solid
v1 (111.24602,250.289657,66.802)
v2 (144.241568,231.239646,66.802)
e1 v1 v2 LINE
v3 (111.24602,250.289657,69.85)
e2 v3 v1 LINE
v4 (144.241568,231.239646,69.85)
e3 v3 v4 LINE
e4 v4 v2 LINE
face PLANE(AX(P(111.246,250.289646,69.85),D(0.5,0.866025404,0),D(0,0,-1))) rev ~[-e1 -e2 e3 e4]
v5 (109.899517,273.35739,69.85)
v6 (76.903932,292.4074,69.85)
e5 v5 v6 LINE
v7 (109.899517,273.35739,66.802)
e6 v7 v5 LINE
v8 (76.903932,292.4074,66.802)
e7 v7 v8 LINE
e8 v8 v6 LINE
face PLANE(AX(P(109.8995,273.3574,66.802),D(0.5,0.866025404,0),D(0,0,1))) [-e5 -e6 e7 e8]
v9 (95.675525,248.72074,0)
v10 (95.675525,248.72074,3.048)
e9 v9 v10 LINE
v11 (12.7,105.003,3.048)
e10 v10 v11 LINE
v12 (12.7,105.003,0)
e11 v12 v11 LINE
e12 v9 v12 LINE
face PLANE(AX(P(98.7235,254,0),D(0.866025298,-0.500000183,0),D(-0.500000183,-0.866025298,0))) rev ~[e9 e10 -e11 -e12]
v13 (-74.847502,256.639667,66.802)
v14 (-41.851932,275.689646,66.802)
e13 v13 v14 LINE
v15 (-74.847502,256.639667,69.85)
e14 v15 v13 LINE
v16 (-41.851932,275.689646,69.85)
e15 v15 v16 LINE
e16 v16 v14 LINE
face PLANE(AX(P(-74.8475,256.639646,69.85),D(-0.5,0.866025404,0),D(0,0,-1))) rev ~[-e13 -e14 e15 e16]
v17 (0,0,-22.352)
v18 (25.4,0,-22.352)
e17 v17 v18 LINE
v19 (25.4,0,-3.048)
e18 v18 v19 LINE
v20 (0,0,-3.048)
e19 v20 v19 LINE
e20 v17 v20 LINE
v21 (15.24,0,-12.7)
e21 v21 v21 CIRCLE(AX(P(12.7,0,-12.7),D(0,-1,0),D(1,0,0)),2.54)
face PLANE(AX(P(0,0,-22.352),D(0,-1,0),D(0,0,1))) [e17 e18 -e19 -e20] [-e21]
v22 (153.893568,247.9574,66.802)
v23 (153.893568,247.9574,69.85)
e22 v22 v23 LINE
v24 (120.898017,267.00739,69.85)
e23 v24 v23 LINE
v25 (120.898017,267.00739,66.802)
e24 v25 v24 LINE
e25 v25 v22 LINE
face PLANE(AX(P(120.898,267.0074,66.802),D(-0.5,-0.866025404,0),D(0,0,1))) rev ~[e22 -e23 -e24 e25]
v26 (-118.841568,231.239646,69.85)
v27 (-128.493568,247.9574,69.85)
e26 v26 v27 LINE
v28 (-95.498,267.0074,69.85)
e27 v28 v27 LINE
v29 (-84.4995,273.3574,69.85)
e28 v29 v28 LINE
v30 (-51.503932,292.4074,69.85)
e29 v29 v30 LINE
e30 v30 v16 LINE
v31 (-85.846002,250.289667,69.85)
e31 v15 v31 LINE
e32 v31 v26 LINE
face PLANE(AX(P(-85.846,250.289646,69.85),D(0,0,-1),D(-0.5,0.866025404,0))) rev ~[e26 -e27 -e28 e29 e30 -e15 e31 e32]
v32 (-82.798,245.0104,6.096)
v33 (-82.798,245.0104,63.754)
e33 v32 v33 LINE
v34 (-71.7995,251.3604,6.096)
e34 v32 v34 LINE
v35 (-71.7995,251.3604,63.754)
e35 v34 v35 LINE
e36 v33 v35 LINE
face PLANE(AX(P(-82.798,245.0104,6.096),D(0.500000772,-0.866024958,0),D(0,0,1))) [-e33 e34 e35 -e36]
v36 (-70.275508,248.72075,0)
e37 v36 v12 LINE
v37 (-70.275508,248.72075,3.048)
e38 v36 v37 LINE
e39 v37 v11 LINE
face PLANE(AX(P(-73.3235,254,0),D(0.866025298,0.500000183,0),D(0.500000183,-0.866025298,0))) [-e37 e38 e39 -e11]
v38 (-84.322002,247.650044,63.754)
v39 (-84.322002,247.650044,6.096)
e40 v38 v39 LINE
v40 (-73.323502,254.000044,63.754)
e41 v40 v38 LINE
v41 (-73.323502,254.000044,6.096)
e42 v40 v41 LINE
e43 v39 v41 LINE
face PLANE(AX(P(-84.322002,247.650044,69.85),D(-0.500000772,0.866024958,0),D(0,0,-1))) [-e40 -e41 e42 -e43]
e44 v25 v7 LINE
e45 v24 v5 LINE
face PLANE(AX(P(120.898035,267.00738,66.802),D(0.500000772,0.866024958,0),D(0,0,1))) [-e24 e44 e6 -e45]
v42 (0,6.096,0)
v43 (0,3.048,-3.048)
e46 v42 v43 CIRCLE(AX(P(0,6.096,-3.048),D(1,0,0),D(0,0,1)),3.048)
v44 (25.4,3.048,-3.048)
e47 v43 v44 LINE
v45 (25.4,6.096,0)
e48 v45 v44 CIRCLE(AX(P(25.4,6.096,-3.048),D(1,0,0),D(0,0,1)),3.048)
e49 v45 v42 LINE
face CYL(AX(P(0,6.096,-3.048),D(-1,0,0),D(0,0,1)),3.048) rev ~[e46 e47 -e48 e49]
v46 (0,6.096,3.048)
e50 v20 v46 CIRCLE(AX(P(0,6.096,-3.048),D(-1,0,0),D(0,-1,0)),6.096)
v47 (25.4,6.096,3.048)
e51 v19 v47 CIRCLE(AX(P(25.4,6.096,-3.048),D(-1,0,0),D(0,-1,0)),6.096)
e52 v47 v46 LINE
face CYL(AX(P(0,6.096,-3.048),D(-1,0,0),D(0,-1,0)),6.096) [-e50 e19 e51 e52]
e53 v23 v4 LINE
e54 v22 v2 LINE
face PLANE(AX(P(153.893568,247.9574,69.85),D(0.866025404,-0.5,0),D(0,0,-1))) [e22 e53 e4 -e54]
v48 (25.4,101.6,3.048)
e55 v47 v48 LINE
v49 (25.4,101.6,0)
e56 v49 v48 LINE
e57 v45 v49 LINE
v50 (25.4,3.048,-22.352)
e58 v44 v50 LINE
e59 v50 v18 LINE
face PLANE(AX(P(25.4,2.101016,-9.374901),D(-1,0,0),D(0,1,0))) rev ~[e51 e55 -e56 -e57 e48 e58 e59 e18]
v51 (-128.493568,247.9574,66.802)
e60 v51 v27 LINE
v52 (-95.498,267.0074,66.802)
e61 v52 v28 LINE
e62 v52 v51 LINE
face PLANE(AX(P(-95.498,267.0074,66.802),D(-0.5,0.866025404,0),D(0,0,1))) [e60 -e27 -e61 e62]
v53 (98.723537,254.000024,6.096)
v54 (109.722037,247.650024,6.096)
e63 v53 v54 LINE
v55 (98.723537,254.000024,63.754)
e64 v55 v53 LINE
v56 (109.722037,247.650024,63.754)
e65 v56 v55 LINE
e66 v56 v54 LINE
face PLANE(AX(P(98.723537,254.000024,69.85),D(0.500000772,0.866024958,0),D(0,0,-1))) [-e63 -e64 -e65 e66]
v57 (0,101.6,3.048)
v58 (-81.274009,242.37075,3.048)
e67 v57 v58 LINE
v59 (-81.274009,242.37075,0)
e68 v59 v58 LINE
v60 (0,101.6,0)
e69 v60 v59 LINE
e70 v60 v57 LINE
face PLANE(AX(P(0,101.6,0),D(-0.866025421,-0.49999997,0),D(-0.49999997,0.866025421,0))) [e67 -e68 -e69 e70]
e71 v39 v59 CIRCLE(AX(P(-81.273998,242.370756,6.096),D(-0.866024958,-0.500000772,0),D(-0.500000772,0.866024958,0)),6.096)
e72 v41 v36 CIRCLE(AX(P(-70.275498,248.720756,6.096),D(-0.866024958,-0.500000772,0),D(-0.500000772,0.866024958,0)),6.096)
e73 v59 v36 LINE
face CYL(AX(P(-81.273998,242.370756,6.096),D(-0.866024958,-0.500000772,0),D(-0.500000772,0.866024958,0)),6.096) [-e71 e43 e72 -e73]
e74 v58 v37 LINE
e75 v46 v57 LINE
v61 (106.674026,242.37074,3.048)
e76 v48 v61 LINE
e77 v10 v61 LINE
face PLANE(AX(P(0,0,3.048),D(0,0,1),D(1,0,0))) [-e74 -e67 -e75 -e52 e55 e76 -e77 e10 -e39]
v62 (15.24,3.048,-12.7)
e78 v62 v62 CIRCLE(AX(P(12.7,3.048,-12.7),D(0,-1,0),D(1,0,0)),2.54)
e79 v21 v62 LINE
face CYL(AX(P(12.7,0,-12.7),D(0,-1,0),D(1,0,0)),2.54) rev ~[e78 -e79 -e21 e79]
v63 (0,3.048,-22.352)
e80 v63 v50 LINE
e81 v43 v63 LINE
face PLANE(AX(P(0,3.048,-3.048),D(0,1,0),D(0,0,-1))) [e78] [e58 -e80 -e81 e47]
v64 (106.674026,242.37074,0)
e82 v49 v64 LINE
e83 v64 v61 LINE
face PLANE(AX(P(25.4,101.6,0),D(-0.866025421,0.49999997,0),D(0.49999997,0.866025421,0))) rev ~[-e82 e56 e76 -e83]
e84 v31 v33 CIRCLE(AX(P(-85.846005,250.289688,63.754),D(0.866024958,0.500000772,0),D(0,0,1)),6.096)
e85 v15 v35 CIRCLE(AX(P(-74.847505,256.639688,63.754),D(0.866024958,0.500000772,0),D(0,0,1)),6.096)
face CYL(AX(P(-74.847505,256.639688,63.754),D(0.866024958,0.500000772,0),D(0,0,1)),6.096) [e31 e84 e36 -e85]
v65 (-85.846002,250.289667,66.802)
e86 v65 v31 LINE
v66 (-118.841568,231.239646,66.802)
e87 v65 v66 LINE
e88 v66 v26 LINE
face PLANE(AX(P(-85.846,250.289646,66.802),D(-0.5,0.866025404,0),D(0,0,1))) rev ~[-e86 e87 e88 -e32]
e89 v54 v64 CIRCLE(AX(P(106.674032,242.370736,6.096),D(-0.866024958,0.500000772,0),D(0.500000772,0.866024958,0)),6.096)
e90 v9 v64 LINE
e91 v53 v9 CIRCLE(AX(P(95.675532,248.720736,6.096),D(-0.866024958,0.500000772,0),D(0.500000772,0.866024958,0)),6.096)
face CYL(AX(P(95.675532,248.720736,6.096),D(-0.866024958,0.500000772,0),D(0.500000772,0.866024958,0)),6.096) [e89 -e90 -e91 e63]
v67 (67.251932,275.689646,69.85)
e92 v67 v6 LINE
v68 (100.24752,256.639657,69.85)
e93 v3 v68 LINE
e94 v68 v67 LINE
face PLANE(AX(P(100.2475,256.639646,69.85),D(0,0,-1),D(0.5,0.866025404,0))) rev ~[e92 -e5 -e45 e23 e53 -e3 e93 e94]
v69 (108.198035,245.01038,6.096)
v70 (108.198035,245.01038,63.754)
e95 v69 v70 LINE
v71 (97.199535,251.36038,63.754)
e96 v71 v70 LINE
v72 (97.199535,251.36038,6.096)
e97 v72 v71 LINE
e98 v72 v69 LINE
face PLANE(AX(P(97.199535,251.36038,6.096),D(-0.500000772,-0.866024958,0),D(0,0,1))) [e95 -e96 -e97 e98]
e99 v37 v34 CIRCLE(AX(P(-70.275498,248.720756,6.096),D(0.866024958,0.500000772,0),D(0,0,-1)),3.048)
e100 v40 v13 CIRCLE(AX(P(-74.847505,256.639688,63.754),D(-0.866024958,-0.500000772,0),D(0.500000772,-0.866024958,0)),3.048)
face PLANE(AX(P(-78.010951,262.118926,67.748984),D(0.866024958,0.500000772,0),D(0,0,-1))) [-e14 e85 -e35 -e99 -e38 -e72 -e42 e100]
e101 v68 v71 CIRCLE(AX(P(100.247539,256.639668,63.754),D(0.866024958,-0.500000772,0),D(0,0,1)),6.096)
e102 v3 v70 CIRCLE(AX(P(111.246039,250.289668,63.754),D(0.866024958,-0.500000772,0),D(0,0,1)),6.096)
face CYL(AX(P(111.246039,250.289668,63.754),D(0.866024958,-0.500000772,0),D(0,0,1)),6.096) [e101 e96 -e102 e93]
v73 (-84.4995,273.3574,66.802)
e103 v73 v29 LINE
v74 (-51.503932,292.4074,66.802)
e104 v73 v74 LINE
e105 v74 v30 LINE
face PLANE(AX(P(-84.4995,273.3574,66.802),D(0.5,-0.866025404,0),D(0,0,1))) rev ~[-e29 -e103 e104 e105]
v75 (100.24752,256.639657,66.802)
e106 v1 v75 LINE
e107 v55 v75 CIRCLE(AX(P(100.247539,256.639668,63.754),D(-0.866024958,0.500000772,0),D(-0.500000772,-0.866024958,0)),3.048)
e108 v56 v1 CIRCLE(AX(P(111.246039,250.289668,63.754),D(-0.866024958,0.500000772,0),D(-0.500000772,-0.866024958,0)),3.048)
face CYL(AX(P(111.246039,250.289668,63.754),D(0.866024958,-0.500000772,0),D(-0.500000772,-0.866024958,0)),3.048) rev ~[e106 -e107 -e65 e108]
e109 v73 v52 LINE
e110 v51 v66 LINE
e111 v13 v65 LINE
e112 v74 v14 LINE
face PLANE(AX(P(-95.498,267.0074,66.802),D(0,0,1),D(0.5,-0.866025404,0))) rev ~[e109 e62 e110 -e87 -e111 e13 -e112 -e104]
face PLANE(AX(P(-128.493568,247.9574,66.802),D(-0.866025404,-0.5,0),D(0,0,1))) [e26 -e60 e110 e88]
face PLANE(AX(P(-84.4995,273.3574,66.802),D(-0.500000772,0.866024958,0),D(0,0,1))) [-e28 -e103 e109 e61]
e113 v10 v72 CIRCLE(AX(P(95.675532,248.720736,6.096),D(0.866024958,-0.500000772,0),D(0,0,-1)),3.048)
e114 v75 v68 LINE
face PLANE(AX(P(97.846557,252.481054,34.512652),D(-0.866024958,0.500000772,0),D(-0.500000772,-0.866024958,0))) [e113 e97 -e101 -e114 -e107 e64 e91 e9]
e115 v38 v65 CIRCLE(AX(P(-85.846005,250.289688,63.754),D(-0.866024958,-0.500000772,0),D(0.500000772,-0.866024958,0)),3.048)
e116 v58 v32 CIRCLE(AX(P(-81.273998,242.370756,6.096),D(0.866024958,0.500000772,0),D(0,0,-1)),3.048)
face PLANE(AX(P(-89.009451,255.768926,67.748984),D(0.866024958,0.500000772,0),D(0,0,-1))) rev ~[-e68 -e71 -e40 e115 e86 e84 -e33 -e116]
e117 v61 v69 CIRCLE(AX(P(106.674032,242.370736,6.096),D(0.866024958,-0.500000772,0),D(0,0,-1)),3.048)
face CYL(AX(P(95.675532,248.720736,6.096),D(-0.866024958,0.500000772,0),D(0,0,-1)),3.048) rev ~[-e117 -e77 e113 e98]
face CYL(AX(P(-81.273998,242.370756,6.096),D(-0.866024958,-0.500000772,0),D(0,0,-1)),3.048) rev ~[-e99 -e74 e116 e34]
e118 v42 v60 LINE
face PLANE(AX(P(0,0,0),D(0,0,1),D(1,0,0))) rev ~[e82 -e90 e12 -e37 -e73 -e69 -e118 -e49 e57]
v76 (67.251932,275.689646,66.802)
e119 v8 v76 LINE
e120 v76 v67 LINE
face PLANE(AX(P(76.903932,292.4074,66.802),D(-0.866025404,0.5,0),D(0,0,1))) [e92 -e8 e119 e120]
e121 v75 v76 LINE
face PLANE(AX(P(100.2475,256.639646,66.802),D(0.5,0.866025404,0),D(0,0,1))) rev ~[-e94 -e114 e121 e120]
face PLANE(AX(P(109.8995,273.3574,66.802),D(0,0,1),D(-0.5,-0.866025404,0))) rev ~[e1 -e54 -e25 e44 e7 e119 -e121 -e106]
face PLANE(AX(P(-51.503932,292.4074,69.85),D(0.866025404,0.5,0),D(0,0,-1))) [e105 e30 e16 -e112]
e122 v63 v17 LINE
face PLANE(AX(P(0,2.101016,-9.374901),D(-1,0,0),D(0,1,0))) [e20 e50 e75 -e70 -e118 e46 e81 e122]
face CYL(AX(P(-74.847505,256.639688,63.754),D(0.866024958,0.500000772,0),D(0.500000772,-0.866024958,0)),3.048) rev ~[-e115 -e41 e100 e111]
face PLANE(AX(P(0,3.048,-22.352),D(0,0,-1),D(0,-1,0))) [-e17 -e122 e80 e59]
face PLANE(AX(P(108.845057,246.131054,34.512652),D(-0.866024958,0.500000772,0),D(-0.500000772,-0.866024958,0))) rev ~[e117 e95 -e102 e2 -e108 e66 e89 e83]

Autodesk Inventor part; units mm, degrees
ref_plane "YZ Plane" through (0, 0, 0) normal (1, 0, 0) x (0, 1, 0)
ref_plane "XZ Plane" through (0, 0, 0) normal (0, 1, 0) x (-1, 0, 0)
ref_plane "XY Plane" through (0, 0, 0) normal (0, 0, 1) x (1, 0, 0)
sketch "Sketch13" plane through (0, 0, 0) normal (0, 0, 1) x (1, 0, 0)
  line L0 (0, 0) -> (25.4, 0)
  line L1 (25.4, 0) -> (25.4, 101.6)
  line L2 (0, 0) -> (0, 101.6)
  line L3 (0, 101.6) -> (-84.322, 247.65)
  line L4 (25.4, 101.6) -> (166.7245, 101.6) construction
  line L5 (25.4, 101.6) -> (109.722, 247.65)
  line L6 (25.4, 101.6) -> (194.044, 101.6) construction
  line L7 (-84.322, 247.65) -> (-73.3235, 254)
  line L8 (109.722, 247.65) -> (98.7235, 254)
  line L9 (-73.3235, 254) -> (12.7, 105.003)
  line L10 (98.7235, 254) -> (12.7, 105.003)
  dimension "d54" = 25.4
  dimension "d55" = 101.6
  dimension "d133" = 60
  dimension "d134" = 150
  dimension "d135" = 12.7
  dimension "d137" = 12.7
  dimension "d139" = 0
  dimension "d140" = 152.4
  dimension "d141" = 152.4
extrude "Plate5" add sketch "Sketch13" along normal blind 3.048
ref_plane "Work Plane1" through (0, 0, 25.4) normal (0, -1, 0) x (1, 0, 0)
sketch "Sketch20" plane through (0, 3.048, 3.048) normal (0, -1, 0) x (1, 0, 0)
  line L0 (25.4, 0) -> (0, 0)
  line L1 (0, 0) -> (0, -25.4)
  line L2 (0, -25.4) -> (25.4, -25.4)
  line L3 (25.4, -25.4) -> (25.4, 0)
edge flange "Flange7" height 25.4 angle 90 thickness 3.048 bend radius 3.048 thickness toward (0, -1, 0) relief tear relief width 3.048 relief depth 1.524 edges at (12.7, 0, 0) wall of the first edge with corners at (25.4, 3.048, 3.048) (0, 3.048, 3.048) (0, 3.048, -22.352) (25.4, 3.048, -22.352)
bend "Bend7"
corner "Corner7"
sketch "Sketch21" plane through (0, 0, -22.352) normal (0, -1, 0) x (1, 0, 0)
  line L0 (25.4, 0) -> (0, 0) projected
  line L1 (25.4, 19.304) -> (25.4, 0) projected
  circle A0 centre (12.7, 9.652) radius 2.54
  point P0 (0, 22.352)
  dimension "d123" = 5.08
  dimension "d124" = 12.7
  dimension "d125" = 9.652
extrude "Cut3" cut sketch "Sketch21" against normal blind 3.048
sketch "Sketch24" plane through (-82.798, 245.0104, 0) normal (-0.5, 0.8660254, 0) x (-0.8660254, -0.5, 0)
  line L0 (-12.7, 0) -> (0, 0)
  line L1 (0, 0) -> (0, 69.85)
  line L2 (0, 69.85) -> (-12.7, 69.85)
  line L3 (-12.7, 69.85) -> (-12.7, 0)
edge flange "Flange8" height 69.85 angle 90 thickness 3.048 bend radius 3.048 thickness toward (-0.5, 0.8660254, 0) relief tear relief width 3.048 relief depth 1.524 corner gap 3.048 corner form 0 edges at (-78.8227, 250.825, 3.048) (104.2227, 250.825, 3.048) wall of the first edge with corners at (-71.7995, 251.3604, 0) (-82.798, 245.0104, 0) (-82.798, 245.0104, 69.85) (-71.7995, 251.3604, 69.85)
bend "Bend8"
corner "Corner8"
sketch "Sketch25" plane through (-71.7995, 251.3604, 66.802) normal (0, 0, 1) x (1, 0, 0)
  line L0 (-10.9985, -6.35) -> (0, 0)
  line L1 (0, 0) -> (-12.7, 21.997)
  line L2 (-12.7, 21.997) -> (-23.6985, 15.647)
  line L3 (-23.6985, 15.647) -> (-10.9985, -6.35)
edge flange "Flange9" height 25.4 angle 90 thickness 3.048 bend radius 3.048 thickness toward (0, 0, 1) relief tear relief width 3.048 relief depth 1.524 corner gap 3.048 corner form 0 edges at (-78.8227, 250.825, 69.85) (104.2227, 250.825, 69.85) wall of the first edge with corners at (-82.798, 245.0104, 66.802) (-71.7995, 251.3604, 66.802) (-84.4995, 273.3574, 66.802) (-95.498, 267.0074, 66.802)
bend "Bend9"
corner "Corner9"
sketch "Sketch26" plane through (-84.4995, 273.3574, 69.85) normal (0.8660254, 0.5, 0) x (0, 0, -1)
  line L0 (0, -19.304) -> (3.048, -19.304) projected
  line L1 (3.048, 0) -> (3.048, -19.304) projected
  line L2 (3.048, 0) -> (0, 0) projected
  line L3 (0, 0) -> (0, -19.304) projected
  point P0 (69.85, -278.9842)
extrude "Extrusion10" add sketch "Sketch26" along normal blind 38.1
sketch "Sketch27" plane through (120.898, 267.0074, 69.85) normal (0.8660254, -0.5, 0) x (0, 0, -1)
  line L0 (0, -19.304) -> (3.048, -19.304) projected
  line L1 (3.048, 0) -> (3.048, -19.304) projected
  line L2 (3.048, 0) -> (0, 0) projected
  line L3 (0, 0) -> (0, -19.304) projected
  point P0 (69.85, -291.6842)
extrude "Extrusion11" add sketch "Sketch27" along normal blind 38.1
sketch "Sketch28" plane through (-95.498, 267.0074, 66.802) normal (-0.8660254, -0.5, 0) x (0, 0, 1)
  line L0 (0, -19.304) -> (3.048, -19.304) projected
  line L1 (3.048, -19.304) -> (3.048, 0) projected
  line L2 (0, 0) -> (3.048, 0) projected
  line L3 (0, 0) -> (0, -19.304) projected
  point P0 (-66.802, -278.9842)
extrude "Extrusion12" add sketch "Sketch28" along normal blind 38.1
sketch "Sketch29" plane through (109.8995, 273.3574, 66.802) normal (-0.8660254, 0.5, 0) x (0, 0, 1)
  line L0 (0, -19.304) -> (3.048, -19.304) projected
  line L1 (3.048, -19.304) -> (3.048, 0) projected
  line L2 (0, 0) -> (3.048, 0) projected
  line L3 (0, 0) -> (0, -19.304) projected
  point P0 (-66.802, -291.6842)
extrude "Extrusion13" add sketch "Sketch29" along normal blind 38.1
equation "\"d126\" = Thickness"
equation "\"d113\" = BendReliefWidth"
equation "\"d114\" = BendReliefDepth"
equation "\"d115\" = MinimumRemnant"
equation "\"d116\" = BendRadius"
equation "\"d119\" = BendRadius"
equation "\"d120\" = CornerReliefSize"
equation "\"d121\" = GapSize"
equation "\"d122\" = JacobiRadiusSize"
equation "\"d142\" = BendReliefWidth"
equation "\"d143\" = BendReliefDepth"
equation "\"d144\" = MinimumRemnant"
equation "\"d145\" = BendRadius"
equation "\"d148\" = BendRadius"
equation "\"d149\" = CornerReliefSize"
equation "\"d150\" = GapSize"
equation "\"d151\" = JacobiRadiusSize"
equation "\"d152\" = BendReliefWidth"
equation "\"d153\" = BendReliefDepth"
equation "\"d154\" = MinimumRemnant"
equation "\"d155\" = BendRadius"
equation "\"d158\" = BendRadius"
equation "\"d159\" = CornerReliefSize"
equation "\"d160\" = GapSize"
equation "\"d161\" = JacobiRadiusSize"
equation "\"BendRadius\" = Thickness"
equation "\"BendReliefWidth\" = Thickness"
equation "\"BendReliefDepth\" = 0.5 * Thickness"
equation "\"CornerReliefSize\" = 4 * Thickness"
equation "\"MinimumRemnant\" = 2 * Thickness"
equation "\"TransitionRadius\" = BendRadius"
equation "\"JacobiRadiusSize\" = BendRadius"
equation "\"GapSize\" = Thickness"
equation "\"d2\" = BendRadius"
equation "\"d69\" = BendRadius"
equation "\"Thickness\" = 3.048"
properties part number "Feeder-Grabber_v2" material "Aluminum 6061"
